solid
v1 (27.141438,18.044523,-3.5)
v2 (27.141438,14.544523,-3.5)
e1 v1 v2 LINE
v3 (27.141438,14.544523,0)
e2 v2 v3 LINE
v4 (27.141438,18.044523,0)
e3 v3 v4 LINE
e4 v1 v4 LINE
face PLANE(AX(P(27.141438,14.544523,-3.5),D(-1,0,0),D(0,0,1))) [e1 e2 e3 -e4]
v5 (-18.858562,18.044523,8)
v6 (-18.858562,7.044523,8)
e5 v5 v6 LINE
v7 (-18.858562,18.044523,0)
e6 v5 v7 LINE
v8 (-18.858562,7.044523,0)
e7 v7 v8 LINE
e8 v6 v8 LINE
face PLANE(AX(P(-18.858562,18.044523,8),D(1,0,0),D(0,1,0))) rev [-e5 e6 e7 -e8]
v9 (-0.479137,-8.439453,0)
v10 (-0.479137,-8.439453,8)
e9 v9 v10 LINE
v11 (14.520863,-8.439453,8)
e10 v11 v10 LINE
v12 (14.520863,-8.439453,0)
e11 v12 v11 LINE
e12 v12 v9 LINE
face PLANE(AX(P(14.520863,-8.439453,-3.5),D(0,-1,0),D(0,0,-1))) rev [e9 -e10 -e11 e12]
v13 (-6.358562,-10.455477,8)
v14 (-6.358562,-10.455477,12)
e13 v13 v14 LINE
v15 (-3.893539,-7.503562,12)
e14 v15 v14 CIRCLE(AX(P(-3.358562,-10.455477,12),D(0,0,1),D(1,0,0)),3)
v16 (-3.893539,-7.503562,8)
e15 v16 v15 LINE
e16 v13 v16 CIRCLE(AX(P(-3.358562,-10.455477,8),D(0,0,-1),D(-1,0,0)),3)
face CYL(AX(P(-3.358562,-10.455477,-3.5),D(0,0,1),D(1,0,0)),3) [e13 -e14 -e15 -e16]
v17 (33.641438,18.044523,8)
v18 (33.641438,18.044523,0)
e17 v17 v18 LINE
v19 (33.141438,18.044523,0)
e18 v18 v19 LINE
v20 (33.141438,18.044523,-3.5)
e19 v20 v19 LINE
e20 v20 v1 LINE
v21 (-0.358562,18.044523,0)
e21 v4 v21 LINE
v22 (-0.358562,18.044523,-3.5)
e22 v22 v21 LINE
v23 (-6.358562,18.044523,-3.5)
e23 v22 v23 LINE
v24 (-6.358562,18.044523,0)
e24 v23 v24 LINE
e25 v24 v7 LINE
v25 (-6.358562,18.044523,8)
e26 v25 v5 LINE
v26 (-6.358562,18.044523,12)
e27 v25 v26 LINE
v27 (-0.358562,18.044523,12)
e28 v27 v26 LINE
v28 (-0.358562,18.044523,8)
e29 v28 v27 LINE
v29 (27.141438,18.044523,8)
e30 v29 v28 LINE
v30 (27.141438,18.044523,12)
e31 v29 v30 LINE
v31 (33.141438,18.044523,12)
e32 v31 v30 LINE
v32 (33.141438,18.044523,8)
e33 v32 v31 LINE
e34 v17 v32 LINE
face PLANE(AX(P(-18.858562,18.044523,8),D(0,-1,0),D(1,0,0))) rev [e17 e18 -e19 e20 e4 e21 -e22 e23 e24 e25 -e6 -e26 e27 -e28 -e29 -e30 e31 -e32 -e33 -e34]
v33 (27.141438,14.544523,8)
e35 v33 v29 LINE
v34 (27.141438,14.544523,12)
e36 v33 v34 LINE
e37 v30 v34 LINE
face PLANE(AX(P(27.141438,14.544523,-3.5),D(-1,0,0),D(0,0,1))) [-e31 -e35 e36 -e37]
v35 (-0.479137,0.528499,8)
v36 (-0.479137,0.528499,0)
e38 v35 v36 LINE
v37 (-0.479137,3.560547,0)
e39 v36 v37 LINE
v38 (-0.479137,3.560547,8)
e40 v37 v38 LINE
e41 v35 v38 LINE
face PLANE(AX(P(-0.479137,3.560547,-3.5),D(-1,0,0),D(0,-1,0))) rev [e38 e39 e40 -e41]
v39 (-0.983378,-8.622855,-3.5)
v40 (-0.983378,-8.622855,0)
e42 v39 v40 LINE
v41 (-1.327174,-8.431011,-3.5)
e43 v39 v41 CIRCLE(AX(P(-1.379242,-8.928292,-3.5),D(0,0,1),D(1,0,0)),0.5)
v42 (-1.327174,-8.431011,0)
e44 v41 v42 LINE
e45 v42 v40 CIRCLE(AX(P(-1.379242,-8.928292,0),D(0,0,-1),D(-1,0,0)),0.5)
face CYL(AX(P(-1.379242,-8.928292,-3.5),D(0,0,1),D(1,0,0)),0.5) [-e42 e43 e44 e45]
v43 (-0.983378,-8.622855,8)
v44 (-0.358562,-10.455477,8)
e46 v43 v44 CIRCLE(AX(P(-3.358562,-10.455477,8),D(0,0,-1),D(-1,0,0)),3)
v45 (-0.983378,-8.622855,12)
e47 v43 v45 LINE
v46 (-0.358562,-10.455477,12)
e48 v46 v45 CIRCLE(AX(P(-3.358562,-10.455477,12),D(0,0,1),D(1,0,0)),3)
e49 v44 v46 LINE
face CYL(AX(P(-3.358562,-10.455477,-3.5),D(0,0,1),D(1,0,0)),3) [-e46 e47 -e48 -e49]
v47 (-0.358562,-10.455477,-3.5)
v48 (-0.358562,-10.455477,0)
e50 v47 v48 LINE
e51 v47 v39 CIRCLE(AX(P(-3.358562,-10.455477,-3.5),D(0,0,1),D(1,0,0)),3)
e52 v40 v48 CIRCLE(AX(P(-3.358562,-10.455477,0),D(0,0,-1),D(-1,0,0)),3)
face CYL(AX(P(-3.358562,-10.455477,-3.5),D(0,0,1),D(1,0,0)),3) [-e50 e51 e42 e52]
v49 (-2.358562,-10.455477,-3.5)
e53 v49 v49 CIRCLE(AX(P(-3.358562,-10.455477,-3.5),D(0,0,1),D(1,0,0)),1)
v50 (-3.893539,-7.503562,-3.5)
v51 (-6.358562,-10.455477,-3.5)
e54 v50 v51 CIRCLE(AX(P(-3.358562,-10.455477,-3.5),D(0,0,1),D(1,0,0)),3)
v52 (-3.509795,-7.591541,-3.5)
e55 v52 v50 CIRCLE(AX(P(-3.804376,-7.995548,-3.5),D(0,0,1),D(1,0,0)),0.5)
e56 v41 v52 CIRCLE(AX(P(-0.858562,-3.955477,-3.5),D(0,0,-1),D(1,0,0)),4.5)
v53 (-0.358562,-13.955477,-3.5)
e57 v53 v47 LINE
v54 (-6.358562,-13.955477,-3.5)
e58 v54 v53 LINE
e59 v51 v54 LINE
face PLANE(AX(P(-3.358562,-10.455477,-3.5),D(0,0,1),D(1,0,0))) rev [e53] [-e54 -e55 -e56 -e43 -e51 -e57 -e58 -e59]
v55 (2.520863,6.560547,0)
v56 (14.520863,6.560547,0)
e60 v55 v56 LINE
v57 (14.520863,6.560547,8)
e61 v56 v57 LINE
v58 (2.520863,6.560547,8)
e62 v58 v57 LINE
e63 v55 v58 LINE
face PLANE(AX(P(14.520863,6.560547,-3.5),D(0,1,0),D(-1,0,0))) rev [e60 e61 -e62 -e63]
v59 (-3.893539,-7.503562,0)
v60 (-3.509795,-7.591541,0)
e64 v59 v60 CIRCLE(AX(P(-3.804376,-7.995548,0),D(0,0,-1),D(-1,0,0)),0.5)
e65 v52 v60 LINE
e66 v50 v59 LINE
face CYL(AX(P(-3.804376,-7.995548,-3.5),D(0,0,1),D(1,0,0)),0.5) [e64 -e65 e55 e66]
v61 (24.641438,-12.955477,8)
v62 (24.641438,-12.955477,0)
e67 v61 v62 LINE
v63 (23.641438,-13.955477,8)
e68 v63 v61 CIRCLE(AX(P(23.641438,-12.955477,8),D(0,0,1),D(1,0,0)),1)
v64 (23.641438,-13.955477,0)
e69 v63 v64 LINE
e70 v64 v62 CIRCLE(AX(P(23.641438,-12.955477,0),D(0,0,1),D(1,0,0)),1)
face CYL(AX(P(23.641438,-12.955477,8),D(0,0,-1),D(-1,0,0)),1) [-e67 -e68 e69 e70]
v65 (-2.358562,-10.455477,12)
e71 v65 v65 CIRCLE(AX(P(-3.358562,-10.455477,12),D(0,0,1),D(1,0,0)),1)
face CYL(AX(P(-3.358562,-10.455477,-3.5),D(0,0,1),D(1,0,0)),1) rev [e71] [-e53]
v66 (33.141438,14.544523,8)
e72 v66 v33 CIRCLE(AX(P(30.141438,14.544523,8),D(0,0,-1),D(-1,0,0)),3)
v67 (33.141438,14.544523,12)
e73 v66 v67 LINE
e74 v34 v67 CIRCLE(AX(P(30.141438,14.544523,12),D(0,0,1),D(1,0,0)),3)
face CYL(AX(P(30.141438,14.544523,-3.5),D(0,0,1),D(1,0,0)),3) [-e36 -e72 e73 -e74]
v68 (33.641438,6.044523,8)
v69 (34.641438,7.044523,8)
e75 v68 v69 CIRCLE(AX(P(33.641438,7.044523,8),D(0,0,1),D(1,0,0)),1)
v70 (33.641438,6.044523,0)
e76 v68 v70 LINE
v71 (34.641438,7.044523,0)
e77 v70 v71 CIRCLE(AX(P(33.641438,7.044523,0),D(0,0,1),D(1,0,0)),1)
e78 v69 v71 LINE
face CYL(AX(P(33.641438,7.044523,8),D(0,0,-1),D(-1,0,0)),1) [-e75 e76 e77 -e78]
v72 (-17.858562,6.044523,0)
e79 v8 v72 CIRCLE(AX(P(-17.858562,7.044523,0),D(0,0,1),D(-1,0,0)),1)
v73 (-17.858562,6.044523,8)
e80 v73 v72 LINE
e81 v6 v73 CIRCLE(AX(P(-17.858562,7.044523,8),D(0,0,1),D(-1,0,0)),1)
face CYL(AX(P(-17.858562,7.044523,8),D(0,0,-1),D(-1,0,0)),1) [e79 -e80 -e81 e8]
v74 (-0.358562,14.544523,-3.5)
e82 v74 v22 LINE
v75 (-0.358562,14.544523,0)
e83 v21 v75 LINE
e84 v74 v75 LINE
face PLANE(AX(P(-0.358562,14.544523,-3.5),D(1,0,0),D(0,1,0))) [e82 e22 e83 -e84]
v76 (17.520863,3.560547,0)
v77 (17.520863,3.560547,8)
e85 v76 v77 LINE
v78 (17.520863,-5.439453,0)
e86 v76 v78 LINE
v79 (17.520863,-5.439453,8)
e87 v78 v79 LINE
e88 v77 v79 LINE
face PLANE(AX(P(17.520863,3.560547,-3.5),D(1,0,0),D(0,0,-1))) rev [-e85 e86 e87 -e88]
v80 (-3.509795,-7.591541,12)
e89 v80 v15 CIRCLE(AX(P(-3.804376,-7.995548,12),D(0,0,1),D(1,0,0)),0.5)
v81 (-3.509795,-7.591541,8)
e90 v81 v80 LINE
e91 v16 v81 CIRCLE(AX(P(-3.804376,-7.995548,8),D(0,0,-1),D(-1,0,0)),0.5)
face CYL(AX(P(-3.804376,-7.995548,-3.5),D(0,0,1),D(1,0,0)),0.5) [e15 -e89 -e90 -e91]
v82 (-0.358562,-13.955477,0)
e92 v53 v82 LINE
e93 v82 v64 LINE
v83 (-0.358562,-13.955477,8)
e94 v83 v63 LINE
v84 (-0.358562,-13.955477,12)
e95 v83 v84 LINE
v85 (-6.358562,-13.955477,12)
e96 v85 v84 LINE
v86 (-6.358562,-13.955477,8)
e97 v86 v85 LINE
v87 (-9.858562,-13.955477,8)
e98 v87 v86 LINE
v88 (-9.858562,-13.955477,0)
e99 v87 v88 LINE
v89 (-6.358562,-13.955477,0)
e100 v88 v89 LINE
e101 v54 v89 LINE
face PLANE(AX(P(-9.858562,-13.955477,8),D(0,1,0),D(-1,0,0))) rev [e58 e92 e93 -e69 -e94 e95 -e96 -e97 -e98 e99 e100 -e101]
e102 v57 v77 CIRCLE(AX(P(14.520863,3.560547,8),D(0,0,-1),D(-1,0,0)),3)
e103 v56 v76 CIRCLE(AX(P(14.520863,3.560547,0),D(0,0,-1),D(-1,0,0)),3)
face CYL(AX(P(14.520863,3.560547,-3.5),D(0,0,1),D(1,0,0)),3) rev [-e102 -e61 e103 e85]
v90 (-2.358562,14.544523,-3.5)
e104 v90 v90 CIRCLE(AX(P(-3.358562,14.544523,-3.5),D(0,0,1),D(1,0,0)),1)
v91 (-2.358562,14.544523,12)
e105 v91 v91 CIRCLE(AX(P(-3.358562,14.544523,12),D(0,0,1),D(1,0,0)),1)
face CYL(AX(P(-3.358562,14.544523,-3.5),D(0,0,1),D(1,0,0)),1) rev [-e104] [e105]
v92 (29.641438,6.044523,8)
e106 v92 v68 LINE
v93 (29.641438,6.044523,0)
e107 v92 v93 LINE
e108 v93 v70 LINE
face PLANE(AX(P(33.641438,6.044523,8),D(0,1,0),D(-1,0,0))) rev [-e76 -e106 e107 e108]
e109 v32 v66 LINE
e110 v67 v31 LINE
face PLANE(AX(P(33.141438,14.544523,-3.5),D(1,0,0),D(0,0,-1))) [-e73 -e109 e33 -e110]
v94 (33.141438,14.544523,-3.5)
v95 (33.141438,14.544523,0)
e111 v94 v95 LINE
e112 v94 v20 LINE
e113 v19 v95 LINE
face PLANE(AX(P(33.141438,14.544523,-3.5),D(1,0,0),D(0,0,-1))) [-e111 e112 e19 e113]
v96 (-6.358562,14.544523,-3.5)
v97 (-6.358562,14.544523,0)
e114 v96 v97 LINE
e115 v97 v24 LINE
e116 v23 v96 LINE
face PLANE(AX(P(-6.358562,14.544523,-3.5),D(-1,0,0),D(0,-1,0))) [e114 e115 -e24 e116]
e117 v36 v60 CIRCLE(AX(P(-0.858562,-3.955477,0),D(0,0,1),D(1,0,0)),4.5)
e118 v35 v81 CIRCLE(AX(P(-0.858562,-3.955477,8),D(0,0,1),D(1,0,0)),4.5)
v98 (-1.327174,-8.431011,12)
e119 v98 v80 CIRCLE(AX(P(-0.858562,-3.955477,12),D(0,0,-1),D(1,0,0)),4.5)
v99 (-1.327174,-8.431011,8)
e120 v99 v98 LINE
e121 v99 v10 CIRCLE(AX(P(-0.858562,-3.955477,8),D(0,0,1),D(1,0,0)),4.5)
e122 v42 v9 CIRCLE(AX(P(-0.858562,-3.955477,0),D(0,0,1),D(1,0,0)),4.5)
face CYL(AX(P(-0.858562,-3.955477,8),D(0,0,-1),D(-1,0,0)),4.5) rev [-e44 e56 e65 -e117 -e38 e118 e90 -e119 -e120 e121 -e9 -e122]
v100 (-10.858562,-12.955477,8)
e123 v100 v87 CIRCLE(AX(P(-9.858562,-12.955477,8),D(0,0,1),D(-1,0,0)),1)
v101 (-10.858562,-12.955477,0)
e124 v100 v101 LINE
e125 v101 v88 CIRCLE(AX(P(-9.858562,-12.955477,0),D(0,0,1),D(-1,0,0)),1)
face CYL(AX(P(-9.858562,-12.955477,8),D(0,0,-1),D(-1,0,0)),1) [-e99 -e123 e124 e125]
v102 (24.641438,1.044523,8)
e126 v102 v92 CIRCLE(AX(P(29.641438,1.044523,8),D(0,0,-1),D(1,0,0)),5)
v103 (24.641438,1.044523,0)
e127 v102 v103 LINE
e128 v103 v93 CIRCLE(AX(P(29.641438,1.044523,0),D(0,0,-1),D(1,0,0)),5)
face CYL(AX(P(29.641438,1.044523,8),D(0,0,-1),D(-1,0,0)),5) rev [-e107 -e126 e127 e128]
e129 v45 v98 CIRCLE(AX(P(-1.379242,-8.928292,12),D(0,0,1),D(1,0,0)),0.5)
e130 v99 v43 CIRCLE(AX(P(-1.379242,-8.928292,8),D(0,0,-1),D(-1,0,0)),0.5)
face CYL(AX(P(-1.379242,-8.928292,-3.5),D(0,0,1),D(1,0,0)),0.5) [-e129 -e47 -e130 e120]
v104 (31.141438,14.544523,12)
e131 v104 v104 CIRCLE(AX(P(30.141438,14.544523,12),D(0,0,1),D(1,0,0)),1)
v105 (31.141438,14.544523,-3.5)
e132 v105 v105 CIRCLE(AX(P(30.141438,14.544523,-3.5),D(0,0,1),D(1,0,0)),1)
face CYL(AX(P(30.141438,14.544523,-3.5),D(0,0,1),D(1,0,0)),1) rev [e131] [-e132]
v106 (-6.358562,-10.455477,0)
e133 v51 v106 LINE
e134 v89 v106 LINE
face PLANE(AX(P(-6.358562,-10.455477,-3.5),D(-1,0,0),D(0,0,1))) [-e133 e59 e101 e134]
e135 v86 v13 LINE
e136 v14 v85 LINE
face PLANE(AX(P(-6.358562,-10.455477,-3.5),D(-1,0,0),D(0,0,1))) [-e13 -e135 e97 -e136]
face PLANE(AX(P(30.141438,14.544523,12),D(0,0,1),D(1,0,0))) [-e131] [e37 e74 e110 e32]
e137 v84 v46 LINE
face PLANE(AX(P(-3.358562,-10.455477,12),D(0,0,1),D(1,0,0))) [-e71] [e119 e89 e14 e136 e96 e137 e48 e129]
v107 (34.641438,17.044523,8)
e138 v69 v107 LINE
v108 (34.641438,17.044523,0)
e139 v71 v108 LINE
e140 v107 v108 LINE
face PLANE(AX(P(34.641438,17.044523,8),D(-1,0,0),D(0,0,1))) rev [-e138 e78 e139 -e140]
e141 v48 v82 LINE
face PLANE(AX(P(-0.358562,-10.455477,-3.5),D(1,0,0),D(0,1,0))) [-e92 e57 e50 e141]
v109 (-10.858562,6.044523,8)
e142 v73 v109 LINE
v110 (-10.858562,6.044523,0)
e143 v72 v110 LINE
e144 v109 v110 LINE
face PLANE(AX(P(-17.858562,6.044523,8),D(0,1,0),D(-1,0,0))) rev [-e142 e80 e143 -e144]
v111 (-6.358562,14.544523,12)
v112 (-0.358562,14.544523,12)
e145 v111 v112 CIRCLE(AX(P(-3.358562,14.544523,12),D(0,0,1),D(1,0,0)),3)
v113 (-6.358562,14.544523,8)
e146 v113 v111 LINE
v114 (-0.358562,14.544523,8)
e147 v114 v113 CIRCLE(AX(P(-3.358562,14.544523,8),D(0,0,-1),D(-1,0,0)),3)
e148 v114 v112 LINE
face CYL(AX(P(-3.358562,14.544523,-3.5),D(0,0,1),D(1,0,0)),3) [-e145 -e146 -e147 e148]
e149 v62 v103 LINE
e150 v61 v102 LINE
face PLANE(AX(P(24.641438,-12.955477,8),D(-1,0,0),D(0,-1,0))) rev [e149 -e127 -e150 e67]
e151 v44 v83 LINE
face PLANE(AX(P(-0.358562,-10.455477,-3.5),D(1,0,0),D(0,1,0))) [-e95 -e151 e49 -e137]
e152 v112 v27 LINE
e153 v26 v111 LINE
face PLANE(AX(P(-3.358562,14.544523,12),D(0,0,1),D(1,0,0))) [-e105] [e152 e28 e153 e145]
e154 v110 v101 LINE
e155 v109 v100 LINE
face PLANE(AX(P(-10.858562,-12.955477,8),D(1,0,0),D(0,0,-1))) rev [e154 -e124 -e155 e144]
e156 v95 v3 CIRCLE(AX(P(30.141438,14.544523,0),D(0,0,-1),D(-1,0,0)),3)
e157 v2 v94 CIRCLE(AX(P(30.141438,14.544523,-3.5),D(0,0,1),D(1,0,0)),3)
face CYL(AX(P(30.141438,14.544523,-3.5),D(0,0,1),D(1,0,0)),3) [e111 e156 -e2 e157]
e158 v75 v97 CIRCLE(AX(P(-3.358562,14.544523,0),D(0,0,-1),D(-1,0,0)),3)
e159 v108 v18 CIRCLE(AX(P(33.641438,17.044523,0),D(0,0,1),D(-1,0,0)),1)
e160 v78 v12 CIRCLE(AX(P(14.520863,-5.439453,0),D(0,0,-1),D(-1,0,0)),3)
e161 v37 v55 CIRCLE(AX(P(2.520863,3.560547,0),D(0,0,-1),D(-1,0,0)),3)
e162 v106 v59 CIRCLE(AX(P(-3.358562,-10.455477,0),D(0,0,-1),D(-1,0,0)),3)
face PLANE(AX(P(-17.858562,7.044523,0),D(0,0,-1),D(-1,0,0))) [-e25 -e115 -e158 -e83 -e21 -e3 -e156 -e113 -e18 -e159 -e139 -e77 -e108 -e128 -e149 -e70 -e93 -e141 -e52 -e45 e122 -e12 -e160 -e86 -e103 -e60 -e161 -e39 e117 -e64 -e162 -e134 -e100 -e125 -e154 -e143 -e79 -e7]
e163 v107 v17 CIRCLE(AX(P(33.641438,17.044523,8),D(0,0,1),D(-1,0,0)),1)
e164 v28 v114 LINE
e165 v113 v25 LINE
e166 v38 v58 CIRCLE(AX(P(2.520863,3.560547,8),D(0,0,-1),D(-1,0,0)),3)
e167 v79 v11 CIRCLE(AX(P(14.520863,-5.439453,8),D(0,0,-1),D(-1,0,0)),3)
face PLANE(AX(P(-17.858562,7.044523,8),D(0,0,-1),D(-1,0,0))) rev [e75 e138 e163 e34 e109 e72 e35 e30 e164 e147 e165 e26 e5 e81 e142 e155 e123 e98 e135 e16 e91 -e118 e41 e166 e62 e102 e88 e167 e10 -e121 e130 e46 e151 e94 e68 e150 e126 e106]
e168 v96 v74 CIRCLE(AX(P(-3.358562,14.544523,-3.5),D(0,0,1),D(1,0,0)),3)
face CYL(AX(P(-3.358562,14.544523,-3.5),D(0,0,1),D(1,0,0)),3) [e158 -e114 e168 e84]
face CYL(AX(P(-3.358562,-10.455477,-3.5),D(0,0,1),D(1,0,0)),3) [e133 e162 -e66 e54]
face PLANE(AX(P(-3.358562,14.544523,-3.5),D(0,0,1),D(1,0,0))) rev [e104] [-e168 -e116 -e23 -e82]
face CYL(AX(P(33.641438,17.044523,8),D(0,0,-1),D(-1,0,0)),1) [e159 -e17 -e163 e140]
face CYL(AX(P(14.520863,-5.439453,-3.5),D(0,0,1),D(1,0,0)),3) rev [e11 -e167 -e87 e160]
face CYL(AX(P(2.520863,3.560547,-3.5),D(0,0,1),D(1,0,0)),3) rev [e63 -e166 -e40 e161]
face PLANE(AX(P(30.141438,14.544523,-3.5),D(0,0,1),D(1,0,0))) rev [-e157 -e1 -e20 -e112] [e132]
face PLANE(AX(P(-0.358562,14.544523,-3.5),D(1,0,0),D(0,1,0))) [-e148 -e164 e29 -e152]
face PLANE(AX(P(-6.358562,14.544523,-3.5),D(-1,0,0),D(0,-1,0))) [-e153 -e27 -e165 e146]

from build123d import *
from build123d.topology import SkipClean

# Parameters (mm, degrees)
SKETCH_2_R               = 4.5
EXTRUDE_1_DEPTH          = 8
EXTRUDE_2_DEPTH          = 4
EXTRUDE_2_DEPTH_BACK     = 11.5
CUT_EXTRUDE_1_DEPTH      = 41.717122437
CUT_EXTRUDE_1_DEPTH_BACK = 41.717122437
CUT_EXTRUDE_2_DEPTH      = 41.717122437
CUT_EXTRUDE_2_DEPTH_BACK = 41.717122437
SKETCH_6_R               = 1


with BuildPart() as part:
    # Эскиз2 → Бобышка-Вытянуть1 (new body)
    with BuildSketch(Plane.XY):
        with BuildLine():
            Line((-18.858561718, 18.044523082), (33.641438282, 18.044523082))
            ThreePointArc((33.641438282, 18.044523082), (34.348545063, 17.751629864), (34.641438282, 17.044523082))
            Line((34.641438282, 17.044523082), (34.641438282, 7.044523082))
            ThreePointArc((34.641438282, 7.044523082), (34.348545063, 6.337416301), (33.641438282, 6.044523082))
            Line((33.641438282, 6.044523082), (29.641438282, 6.044523082))
            ThreePointArc((29.641438282, 6.044523082), (26.105904376, 4.580056988), (24.641438282, 1.044523082))
            Line((24.641438282, 1.044523082), (24.641438282, -12.955476918))
            ThreePointArc((24.641438282, -12.955476918), (24.348545063, -13.662583699), (23.641438282, -13.955476918))
            Line((23.641438282, -13.955476918), (-9.858561718, -13.955476918))
            ThreePointArc((-9.858561718, -13.955476918), (-10.565668499, -13.662583699), (-10.858561718, -12.955476918))
            Line((-10.858561718, -12.955476918), (-10.858561718, 6.044523082))
            Line((-10.858561718, 6.044523082), (-17.858561718, 6.044523082))
            ThreePointArc((-17.858561718, 6.044523082), (-18.565668499, 6.337416301), (-18.858561718, 7.044523082))
            Line((-18.858561718, 7.044523082), (-18.858561718, 18.044523082))
        make_face()
        with Locations((-0.858561718, -3.955476918)):
            Circle(SKETCH_2_R, mode=Mode.SUBTRACT)
    extrude(amount=EXTRUDE_1_DEPTH)

    # Эскиз3 → Бобышка-Вытянуть2 (add, two sides: drawn at the far end of the back side and taken through both)
    with SkipClean():  # the faces are left unmerged after this step: merging them gives an invalid solid
        with BuildSketch(Plane.XY.offset(8).offset(-EXTRUDE_2_DEPTH_BACK)):
            with BuildLine():
                Line((27.141438282, 14.544523082), (27.141438282, 18.044523082))
                Line((27.141438282, 18.044523082), (33.141438282, 18.044523082))
                Line((33.141438282, 18.044523082), (33.141438282, 14.544523082))
                ThreePointArc((33.141438282, 14.544523082), (30.141438282, 11.544523082), (27.141438282, 14.544523082))
            make_face()
            with BuildLine():
                Line((-0.358561718, 14.544523082), (-0.358561718, 18.044523082))
                Line((-0.358561718, 18.044523082), (-6.358561718, 18.044523082))
                Line((-6.358561718, 18.044523082), (-6.358561718, 14.544523082))
                ThreePointArc((-6.358561718, 14.544523082), (-3.358561718, 11.544523082), (-0.358561718, 14.544523082))
            make_face()
            with BuildLine():
                Line((-6.358561718, -10.455476918), (-6.358561718, -13.955476918))
                Line((-6.358561718, -13.955476918), (-0.358561718, -13.955476918))
                Line((-0.358561718, -13.955476918), (-0.358561718, -10.455476918))
                ThreePointArc((-0.358561718, -10.455476918), (-0.519059003, -9.487373446), (-0.983377938, -8.622855294))
                ThreePointArc((-0.983377938, -8.622855294), (-1.135599023, -8.491670945), (-1.327173883, -8.4310107))
                ThreePointArc((-1.327173883, -8.4310107), (-2.473967575, -8.155532145), (-3.509794913, -7.591541073))
                ThreePointArc((-3.509794913, -7.591541073), (-3.692643427, -7.508192328), (-3.893539312, -7.503562458))
                ThreePointArc((-3.893539312, -7.503562458), (-5.661270208, -8.532579726), (-6.358561718, -10.455476918))
            make_face()
        extrude(amount=EXTRUDE_2_DEPTH + EXTRUDE_2_DEPTH_BACK)
    add(part.part.scale(1), mode=Mode.REPLACE)  # the faces are merged on a copy

    # Эскиз5 → Вырез-Вытянуть1 (cut, two sides: drawn at the far end of the back side and taken through both)
    with BuildSketch(Plane.XY.offset(8).offset(-CUT_EXTRUDE_1_DEPTH_BACK)):
        with BuildLine():
            Line((14.520862779, 6.560547497), (2.520862779, 6.560547497))
            ThreePointArc((2.520862779, 6.560547497), (0.399542436, 5.681867841), (-0.479137221, 3.560547497))
            Line((-0.479137221, 3.560547497), (-0.479137221, -8.439452503))
            Line((-0.479137221, -8.439452503), (14.520862779, -8.439452503))
            ThreePointArc((14.520862779, -8.439452503), (16.642183123, -7.560772847), (17.520862779, -5.439452503))
            Line((17.520862779, -5.439452503), (17.520862779, 3.560547497))
            ThreePointArc((17.520862779, 3.560547497), (16.642183123, 5.681867841), (14.520862779, 6.560547497))
        make_face()
    extrude(amount=CUT_EXTRUDE_1_DEPTH + CUT_EXTRUDE_1_DEPTH_BACK, mode=Mode.SUBTRACT)

    # Эскиз6 → Вырез-Вытянуть2 (cut, two sides: drawn at the far end of the back side and taken through both)
    with BuildSketch(Plane.XY.offset(8).offset(-CUT_EXTRUDE_2_DEPTH_BACK)):
        with Locations((-3.358561718, 14.544523082)):
            Circle(SKETCH_6_R)
        with Locations((30.141438282, 14.544523082)):
            Circle(SKETCH_6_R)
        with Locations((-3.358561718, -10.455476918)):
            Circle(SKETCH_6_R)
    extrude(amount=CUT_EXTRUDE_2_DEPTH + CUT_EXTRUDE_2_DEPTH_BACK, mode=Mode.SUBTRACT)


solid = part.part
